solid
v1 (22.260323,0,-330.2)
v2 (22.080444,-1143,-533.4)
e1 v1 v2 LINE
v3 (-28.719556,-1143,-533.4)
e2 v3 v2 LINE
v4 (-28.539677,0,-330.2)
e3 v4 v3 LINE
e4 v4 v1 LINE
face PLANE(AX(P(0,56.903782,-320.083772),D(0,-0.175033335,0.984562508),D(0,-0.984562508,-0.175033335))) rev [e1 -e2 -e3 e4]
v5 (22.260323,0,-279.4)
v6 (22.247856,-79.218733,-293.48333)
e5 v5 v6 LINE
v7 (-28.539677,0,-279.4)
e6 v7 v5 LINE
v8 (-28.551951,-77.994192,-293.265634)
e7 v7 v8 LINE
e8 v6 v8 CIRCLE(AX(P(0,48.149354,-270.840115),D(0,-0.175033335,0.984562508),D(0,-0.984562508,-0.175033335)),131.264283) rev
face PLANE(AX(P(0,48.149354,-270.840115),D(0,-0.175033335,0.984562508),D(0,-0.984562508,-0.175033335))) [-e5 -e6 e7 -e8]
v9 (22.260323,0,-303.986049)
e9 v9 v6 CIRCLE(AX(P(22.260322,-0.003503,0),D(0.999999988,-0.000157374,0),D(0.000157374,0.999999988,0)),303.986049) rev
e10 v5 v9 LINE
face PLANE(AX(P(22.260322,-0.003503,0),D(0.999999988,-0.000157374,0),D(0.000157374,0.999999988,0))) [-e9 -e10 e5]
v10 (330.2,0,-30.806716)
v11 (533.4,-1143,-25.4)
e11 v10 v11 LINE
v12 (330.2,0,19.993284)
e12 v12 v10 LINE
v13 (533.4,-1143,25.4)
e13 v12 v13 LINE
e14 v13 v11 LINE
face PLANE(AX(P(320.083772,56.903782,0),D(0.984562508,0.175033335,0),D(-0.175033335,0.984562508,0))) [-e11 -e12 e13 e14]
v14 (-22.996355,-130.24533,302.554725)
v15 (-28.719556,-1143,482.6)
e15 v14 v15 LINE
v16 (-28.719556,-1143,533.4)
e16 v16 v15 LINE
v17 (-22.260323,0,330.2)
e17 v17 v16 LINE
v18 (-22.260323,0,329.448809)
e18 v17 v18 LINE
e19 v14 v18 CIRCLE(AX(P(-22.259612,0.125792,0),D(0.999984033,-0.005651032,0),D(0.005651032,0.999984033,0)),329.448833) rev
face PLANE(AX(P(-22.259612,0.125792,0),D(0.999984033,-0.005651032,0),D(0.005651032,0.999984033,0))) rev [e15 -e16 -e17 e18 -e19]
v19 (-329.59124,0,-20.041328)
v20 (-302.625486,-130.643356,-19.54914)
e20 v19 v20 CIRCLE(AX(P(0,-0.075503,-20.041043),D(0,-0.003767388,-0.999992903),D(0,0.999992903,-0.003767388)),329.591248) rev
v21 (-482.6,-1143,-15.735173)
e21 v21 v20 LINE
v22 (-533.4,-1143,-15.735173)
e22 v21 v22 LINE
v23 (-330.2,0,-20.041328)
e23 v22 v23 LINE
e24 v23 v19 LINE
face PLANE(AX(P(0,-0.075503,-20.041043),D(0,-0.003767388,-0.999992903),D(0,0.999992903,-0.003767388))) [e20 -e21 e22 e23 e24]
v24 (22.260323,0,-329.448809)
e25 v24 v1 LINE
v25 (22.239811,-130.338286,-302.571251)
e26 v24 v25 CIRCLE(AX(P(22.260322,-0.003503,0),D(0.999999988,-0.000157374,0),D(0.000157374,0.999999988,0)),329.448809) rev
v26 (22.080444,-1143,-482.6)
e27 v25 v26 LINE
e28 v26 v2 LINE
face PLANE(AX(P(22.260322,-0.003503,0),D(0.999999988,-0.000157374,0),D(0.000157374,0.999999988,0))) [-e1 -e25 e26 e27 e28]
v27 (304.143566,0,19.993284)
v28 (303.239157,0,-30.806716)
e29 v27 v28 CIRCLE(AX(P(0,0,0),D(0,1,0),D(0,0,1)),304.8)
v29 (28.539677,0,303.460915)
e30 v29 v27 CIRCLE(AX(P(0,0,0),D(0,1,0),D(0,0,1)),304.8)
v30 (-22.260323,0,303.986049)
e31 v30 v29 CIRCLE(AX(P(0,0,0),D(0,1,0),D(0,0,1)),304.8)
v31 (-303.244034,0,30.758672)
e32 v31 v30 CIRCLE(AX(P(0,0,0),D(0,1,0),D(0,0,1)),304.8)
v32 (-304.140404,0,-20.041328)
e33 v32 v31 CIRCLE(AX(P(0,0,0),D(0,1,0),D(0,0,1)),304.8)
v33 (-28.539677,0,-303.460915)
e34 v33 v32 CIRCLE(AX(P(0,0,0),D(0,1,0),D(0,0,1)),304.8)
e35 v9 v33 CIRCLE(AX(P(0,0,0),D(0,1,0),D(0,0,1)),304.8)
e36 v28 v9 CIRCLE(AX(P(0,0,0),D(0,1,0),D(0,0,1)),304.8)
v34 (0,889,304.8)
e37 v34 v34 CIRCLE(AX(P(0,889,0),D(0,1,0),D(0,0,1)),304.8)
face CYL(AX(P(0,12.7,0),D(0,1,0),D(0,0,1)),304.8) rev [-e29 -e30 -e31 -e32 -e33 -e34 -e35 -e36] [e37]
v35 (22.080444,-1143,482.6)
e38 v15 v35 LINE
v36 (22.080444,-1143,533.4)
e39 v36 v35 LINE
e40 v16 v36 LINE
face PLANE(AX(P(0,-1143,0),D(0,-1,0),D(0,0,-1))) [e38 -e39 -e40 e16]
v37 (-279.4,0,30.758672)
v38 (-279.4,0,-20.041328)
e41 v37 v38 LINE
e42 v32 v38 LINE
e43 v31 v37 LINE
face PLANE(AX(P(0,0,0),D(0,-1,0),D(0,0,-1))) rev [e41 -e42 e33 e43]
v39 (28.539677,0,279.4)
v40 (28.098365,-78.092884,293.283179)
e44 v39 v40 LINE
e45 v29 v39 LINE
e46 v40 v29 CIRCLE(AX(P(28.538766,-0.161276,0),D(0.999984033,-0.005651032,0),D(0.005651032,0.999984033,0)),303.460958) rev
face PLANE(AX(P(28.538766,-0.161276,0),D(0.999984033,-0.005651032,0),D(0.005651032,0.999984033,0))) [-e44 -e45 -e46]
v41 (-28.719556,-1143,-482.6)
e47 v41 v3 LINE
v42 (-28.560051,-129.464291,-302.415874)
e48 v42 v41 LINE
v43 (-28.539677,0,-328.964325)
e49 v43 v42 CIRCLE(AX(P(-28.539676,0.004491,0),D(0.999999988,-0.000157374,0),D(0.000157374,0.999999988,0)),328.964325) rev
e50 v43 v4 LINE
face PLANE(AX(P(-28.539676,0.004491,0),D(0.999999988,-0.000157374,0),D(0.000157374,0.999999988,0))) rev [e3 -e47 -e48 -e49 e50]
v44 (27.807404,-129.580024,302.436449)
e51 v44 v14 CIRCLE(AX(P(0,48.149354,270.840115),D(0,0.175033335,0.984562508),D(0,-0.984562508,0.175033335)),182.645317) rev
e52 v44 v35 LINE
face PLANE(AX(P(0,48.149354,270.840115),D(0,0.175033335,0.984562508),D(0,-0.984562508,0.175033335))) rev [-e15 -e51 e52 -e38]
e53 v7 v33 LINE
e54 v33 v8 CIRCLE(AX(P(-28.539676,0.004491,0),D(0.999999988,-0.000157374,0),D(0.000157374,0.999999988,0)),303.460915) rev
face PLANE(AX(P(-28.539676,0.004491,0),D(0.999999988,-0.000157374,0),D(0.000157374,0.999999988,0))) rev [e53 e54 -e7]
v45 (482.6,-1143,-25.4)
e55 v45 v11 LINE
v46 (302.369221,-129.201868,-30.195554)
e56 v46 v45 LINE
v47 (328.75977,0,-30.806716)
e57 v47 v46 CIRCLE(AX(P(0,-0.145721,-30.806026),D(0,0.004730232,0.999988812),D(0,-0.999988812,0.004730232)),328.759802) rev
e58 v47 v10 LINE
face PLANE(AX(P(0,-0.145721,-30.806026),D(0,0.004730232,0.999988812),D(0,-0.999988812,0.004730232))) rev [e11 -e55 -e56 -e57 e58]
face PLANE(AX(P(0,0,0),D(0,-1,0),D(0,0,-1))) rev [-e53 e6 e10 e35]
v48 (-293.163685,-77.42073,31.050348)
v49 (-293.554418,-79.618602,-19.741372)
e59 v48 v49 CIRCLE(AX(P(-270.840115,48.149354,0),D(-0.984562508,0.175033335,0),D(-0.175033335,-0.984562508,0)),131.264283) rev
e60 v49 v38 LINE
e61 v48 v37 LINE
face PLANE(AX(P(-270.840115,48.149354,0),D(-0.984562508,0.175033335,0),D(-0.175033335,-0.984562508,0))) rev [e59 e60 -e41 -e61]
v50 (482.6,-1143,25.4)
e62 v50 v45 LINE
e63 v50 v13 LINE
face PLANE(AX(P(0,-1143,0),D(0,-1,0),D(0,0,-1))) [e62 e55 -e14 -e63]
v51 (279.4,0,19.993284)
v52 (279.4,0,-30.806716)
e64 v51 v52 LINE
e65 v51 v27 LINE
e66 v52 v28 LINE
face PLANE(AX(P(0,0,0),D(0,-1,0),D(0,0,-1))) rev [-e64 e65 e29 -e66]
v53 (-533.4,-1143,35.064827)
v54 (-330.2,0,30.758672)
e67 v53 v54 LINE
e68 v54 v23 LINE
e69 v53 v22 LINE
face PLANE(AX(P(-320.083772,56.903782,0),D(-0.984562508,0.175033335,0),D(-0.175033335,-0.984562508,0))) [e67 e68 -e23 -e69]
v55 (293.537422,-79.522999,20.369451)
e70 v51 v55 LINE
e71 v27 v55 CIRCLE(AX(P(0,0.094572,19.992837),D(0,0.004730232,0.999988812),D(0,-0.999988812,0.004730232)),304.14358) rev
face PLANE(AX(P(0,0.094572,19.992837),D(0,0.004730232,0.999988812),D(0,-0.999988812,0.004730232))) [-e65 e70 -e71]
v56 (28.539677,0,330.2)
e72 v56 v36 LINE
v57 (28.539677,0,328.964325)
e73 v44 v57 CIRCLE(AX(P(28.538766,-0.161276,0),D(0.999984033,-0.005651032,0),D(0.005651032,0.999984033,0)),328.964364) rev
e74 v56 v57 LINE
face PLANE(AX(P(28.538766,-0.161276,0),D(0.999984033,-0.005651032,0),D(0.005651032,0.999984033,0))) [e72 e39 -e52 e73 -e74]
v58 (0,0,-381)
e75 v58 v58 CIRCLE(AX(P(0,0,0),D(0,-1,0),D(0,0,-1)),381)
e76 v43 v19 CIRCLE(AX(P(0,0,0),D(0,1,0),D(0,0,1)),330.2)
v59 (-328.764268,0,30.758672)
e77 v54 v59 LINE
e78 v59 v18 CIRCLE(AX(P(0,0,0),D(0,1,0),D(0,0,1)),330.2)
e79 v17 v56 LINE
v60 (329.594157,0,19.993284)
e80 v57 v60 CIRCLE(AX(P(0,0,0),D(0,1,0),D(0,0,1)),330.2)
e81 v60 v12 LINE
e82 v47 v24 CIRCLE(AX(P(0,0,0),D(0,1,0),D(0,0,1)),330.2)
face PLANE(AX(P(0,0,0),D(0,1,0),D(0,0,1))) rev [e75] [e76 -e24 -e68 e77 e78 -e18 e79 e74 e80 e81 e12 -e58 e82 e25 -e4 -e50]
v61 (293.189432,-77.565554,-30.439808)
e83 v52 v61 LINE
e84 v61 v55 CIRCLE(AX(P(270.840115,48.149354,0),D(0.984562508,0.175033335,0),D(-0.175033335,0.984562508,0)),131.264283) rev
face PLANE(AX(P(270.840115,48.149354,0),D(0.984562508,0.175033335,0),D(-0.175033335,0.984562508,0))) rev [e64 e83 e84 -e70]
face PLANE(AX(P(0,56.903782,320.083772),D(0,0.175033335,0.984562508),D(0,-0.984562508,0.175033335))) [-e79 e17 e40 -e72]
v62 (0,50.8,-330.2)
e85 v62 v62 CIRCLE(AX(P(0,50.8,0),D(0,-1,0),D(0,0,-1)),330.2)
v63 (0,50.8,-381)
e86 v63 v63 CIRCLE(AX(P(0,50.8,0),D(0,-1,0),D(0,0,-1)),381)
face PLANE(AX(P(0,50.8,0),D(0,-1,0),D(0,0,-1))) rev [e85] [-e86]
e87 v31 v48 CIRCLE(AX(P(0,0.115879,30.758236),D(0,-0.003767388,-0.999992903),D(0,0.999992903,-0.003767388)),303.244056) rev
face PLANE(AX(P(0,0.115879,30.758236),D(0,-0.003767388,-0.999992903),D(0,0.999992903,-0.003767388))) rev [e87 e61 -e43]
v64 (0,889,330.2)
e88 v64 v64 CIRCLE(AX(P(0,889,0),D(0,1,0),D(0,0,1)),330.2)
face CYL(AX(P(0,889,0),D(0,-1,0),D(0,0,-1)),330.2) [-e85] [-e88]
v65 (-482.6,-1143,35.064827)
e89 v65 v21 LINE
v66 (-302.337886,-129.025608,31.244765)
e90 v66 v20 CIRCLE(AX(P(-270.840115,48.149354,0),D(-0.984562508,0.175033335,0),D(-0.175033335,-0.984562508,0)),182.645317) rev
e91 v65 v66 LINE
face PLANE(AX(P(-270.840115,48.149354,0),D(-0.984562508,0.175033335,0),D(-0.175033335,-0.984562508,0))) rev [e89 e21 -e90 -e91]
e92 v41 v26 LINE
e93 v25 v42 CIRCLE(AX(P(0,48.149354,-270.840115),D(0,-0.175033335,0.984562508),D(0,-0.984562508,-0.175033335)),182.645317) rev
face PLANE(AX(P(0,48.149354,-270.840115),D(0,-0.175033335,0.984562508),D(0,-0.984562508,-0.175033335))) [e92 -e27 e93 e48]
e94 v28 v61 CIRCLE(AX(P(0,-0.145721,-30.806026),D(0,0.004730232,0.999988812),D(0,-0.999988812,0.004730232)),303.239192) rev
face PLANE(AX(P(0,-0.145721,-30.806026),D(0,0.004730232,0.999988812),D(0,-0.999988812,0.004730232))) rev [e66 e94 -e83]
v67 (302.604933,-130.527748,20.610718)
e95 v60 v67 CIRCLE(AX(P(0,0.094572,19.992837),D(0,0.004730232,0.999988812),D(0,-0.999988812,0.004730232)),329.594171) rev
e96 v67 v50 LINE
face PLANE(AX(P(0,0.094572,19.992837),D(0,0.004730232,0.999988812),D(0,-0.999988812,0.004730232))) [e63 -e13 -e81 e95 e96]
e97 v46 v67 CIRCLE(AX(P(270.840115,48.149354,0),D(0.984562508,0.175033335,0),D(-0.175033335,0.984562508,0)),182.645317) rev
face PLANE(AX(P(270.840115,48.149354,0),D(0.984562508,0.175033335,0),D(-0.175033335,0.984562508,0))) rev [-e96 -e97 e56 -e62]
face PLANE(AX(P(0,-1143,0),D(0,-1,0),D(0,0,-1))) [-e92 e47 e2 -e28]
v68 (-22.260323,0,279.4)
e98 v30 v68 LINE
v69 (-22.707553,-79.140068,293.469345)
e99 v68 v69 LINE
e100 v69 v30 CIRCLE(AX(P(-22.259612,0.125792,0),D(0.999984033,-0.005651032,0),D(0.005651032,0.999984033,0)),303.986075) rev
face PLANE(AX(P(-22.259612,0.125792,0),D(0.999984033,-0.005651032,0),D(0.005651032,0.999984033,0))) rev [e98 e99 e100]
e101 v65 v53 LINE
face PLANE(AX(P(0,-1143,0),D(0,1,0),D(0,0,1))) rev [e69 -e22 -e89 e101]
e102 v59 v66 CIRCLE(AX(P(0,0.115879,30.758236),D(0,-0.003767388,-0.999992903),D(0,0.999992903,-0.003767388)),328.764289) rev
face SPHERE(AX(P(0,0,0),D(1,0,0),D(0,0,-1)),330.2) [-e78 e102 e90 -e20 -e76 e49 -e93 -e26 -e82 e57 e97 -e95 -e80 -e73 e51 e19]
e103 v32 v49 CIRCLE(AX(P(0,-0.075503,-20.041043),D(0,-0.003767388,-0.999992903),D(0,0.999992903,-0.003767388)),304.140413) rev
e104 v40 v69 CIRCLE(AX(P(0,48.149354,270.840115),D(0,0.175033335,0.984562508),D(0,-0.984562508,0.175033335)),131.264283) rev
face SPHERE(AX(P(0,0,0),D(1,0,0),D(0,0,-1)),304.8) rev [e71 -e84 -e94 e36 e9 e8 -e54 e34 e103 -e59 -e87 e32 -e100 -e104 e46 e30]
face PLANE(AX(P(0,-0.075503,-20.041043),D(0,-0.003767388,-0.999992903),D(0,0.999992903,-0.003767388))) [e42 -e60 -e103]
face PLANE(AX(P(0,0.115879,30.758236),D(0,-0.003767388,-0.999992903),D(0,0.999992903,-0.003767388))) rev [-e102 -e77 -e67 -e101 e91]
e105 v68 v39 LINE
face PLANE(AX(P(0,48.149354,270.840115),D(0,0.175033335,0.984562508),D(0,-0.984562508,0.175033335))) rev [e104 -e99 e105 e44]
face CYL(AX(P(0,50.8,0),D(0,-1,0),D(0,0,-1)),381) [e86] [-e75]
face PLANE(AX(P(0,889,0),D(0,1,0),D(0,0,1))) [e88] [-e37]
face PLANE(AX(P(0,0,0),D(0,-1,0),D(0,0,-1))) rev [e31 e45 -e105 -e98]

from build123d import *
from build123d.topology import SkipClean

# Parameters (mm, degrees)
SKETCH1_R              = 330.20000000000005
BOSS_EXTRUDE1_DEPTH    = 889
SKETCH2_R              = 304.8
CUT_EXTRUDE1_DEPTH     = 876.3
SKETCH5_R              = 381
BOSS_EXTRUDE2_DEPTH    = 50.8
CUT_EXTRUDE2_START     = -1e-07
CUT_EXTRUDE2_OUTLINE_R = 304.8
CUT_EXTRUDE2_DEPTH     = 889.0000002


with BuildPart() as part:
    # Sketch1 → Boss-Extrude1 (new body)
    with BuildSketch(Plane(origin=(0, 0, 0), x_dir=(1, 0, 0), z_dir=(0, 1, 0))):
        with Locations(Location((0, 0, 0), (0, 0, 270))):
            Circle(SKETCH1_R)
    extrude(amount=BOSS_EXTRUDE1_DEPTH)

    # Sketch2 → Cut-Extrude1 (cut)
    with BuildSketch(Plane(origin=(0, 889, 0), x_dir=(1, 0, 0), z_dir=(0, 1, 0))):
        with Locations(Location((0, 0, 0), (0, 0, 270))):
            Circle(SKETCH2_R)
    extrude(amount=-CUT_EXTRUDE1_DEPTH, mode=Mode.SUBTRACT)

    # Sketch5 → Boss-Extrude2 (add)
    with BuildSketch(Plane.XZ):
        with Locations(Location((0, 0, 0), (0, 0, 270))):
            Circle(SKETCH5_R)
    extrude(amount=-BOSS_EXTRUDE2_DEPTH)

    # Sketch8 → Revolve1 (revolve)
    with BuildSketch(Plane.XZ):
        with BuildLine():
            Line((330.2, 0), (-330.2, 0))
            ThreePointArc((-330.2, 0), (2.022e-14, 330.2), (330.2, 0))
        make_face()
    revolve(axis=Axis((330.2, 0, 0), (-1, 0, 0)))

    # Sketch11 → Cut-Revolve1 (revolve, cut)
    with BuildSketch(Plane(origin=(0, 0, 0), x_dir=(1, 0, 0), z_dir=(0, 1, 0))):
        with BuildLine():
            Line((304.80000000000007, 0), (-304.80000000000007, 0))
            ThreePointArc((-304.80000000000007, 0), (1.866e-14, 304.80000000000007), (304.80000000000007, 0))
        make_face()
    revolve(axis=Axis((304.80000000000007, 0, 0), (-1, 0, 0)), mode=Mode.SUBTRACT)

    # Cut-Extrude2: read off the stored shape, not the designer's step
    # Cut-Extrude2 outline → Cut-Extrude2 (cut)
    with SkipClean():  # the faces are left unmerged after this step: merging them gives an invalid solid
        with BuildSketch(Plane(origin=(0, 0, 0), x_dir=(1, 0, 0), z_dir=(0, 1, 0)).offset(CUT_EXTRUDE2_START)):
            Circle(CUT_EXTRUDE2_OUTLINE_R)
        extrude(amount=CUT_EXTRUDE2_DEPTH, mode=Mode.SUBTRACT)

    # Sketch14 → Loft3 section 0
    with SkipClean():  # the faces are left unmerged after this step: merging them gives an invalid solid
        with BuildSketch(Plane(origin=(0, 0, 0), x_dir=(1, 0, 0), z_dir=(0, 1, 0))):
            with BuildLine():
                Line((-22.260323000361307, -330.2), (28.53967699963869, -330.2))
                Line((28.53967699963869, -330.2), (28.53967699963869, -279.4))
                Line((28.53967699963869, -279.4), (-22.260323000361307, -279.4))
                Line((-22.260323000361307, -279.4), (-22.260323000361307, -330.2))
            make_face()
        # Sketch17 → Loft3 section 1
        with BuildSketch(Plane(origin=(0, -1143, 0), x_dir=(1, 0, 0), z_dir=(0, 1, 0))):
            with BuildLine():
                Line((-28.71955564169997, -533.4000000000001), (22.08044435830003, -533.4000000000001))
                Line((22.08044435830003, -533.4000000000001), (22.080444358300024, -482.6))
                Line((22.080444358300024, -482.6), (-28.71955564169998, -482.6))
                Line((-28.71955564169998, -482.6), (-28.71955564169997, -533.4000000000001))
            make_face()
        loft()

    # Sketch14<7> → Loft4 section 0
    with SkipClean():  # the faces are left unmerged after this step: merging them gives an invalid solid
        with BuildSketch(Plane(origin=(0, 0, 0), x_dir=(1, 0, 0), z_dir=(0, 1, 0))):
            with BuildLine():
                Line((279.4, -19.993284341920333), (330.2, -19.993284341920333))
                Line((330.2, -19.993284341920333), (330.2, 30.806715658079664))
                Line((330.2, 30.806715658079664), (279.4, 30.806715658079664))
                Line((279.4, 30.806715658079664), (279.4, -19.993284341920333))
            make_face()
        # Sketch17<4> → Loft4 section 1
        with BuildSketch(Plane(origin=(0, -1143, 0), x_dir=(1, 0, 0), z_dir=(0, 1, 0))):
            with BuildLine():
                Line((482.5999999999999, -25.4), (533.3999999999999, -25.4))
                Line((533.3999999999999, -25.4), (533.3999999999999, 25.4))
                Line((533.3999999999999, 25.4), (482.5999999999999, 25.4))
                Line((482.5999999999999, 25.4), (482.5999999999999, -25.4))
            make_face()
        loft()

    # Sketch14<8> → Loft5 section 0
    with SkipClean():  # the faces are left unmerged after this step: merging them gives an invalid solid
        with BuildSketch(Plane(origin=(0, 0, 0), x_dir=(1, 0, 0), z_dir=(0, 1, 0))):
            with BuildLine():
                Line((-28.539676999638676, 279.4), (22.260323000361325, 279.4))
                Line((22.260323000361325, 279.4), (22.26032300036131, 330.2))
                Line((22.26032300036131, 330.2), (-28.539676999638687, 330.2))
                Line((-28.539676999638687, 330.2), (-28.539676999638676, 279.4))
            make_face()
        # Sketch17<5> → Loft5 section 1
        with BuildSketch(Plane(origin=(0, -1143, 0), x_dir=(1, 0, 0), z_dir=(0, 1, 0))):
            with BuildLine():
                Line((-28.71955564169995, 482.59999999999997), (22.080444358300046, 482.59999999999997))
                Line((22.080444358300046, 482.59999999999997), (22.08044435830004, 533.4))
                Line((22.08044435830004, 533.4), (-28.71955564169996, 533.4))
                Line((-28.71955564169996, 533.4), (-28.71955564169995, 482.59999999999997))
            make_face()
        loft()

    # Sketch17<6> → Loft6 section 0
    with SkipClean():  # the faces are left unmerged after this step: merging them gives an invalid solid
        with BuildSketch(Plane(origin=(0, -1143, 0), x_dir=(1, 0, 0), z_dir=(0, 1, 0))):
            with BuildLine():
                Line((-482.59999999999997, -35.064827171702525), (-533.4, -35.06482717170253))
                Line((-533.4, -35.06482717170253), (-533.4, 15.735172828297465))
                Line((-533.4, 15.735172828297465), (-482.59999999999997, 15.73517282829747))
                Line((-482.59999999999997, 15.73517282829747), (-482.59999999999997, -35.064827171702525))
            make_face()
        # Sketch14<9> → Loft6 section 1
        with BuildSketch(Plane(origin=(0, 0, 0), x_dir=(1, 0, 0), z_dir=(0, 1, 0))):
            with BuildLine():
                Line((-330.20000000000005, -30.75867207748477), (-279.40000000000003, -30.75867207748477))
                Line((-279.40000000000003, -30.75867207748477), (-279.40000000000003, 20.041327922515226))
                Line((-279.40000000000003, 20.041327922515226), (-330.20000000000005, 20.041327922515226))
                Line((-330.20000000000005, 20.041327922515226), (-330.20000000000005, -30.75867207748477))
            make_face()
        loft()


solid = part.part
